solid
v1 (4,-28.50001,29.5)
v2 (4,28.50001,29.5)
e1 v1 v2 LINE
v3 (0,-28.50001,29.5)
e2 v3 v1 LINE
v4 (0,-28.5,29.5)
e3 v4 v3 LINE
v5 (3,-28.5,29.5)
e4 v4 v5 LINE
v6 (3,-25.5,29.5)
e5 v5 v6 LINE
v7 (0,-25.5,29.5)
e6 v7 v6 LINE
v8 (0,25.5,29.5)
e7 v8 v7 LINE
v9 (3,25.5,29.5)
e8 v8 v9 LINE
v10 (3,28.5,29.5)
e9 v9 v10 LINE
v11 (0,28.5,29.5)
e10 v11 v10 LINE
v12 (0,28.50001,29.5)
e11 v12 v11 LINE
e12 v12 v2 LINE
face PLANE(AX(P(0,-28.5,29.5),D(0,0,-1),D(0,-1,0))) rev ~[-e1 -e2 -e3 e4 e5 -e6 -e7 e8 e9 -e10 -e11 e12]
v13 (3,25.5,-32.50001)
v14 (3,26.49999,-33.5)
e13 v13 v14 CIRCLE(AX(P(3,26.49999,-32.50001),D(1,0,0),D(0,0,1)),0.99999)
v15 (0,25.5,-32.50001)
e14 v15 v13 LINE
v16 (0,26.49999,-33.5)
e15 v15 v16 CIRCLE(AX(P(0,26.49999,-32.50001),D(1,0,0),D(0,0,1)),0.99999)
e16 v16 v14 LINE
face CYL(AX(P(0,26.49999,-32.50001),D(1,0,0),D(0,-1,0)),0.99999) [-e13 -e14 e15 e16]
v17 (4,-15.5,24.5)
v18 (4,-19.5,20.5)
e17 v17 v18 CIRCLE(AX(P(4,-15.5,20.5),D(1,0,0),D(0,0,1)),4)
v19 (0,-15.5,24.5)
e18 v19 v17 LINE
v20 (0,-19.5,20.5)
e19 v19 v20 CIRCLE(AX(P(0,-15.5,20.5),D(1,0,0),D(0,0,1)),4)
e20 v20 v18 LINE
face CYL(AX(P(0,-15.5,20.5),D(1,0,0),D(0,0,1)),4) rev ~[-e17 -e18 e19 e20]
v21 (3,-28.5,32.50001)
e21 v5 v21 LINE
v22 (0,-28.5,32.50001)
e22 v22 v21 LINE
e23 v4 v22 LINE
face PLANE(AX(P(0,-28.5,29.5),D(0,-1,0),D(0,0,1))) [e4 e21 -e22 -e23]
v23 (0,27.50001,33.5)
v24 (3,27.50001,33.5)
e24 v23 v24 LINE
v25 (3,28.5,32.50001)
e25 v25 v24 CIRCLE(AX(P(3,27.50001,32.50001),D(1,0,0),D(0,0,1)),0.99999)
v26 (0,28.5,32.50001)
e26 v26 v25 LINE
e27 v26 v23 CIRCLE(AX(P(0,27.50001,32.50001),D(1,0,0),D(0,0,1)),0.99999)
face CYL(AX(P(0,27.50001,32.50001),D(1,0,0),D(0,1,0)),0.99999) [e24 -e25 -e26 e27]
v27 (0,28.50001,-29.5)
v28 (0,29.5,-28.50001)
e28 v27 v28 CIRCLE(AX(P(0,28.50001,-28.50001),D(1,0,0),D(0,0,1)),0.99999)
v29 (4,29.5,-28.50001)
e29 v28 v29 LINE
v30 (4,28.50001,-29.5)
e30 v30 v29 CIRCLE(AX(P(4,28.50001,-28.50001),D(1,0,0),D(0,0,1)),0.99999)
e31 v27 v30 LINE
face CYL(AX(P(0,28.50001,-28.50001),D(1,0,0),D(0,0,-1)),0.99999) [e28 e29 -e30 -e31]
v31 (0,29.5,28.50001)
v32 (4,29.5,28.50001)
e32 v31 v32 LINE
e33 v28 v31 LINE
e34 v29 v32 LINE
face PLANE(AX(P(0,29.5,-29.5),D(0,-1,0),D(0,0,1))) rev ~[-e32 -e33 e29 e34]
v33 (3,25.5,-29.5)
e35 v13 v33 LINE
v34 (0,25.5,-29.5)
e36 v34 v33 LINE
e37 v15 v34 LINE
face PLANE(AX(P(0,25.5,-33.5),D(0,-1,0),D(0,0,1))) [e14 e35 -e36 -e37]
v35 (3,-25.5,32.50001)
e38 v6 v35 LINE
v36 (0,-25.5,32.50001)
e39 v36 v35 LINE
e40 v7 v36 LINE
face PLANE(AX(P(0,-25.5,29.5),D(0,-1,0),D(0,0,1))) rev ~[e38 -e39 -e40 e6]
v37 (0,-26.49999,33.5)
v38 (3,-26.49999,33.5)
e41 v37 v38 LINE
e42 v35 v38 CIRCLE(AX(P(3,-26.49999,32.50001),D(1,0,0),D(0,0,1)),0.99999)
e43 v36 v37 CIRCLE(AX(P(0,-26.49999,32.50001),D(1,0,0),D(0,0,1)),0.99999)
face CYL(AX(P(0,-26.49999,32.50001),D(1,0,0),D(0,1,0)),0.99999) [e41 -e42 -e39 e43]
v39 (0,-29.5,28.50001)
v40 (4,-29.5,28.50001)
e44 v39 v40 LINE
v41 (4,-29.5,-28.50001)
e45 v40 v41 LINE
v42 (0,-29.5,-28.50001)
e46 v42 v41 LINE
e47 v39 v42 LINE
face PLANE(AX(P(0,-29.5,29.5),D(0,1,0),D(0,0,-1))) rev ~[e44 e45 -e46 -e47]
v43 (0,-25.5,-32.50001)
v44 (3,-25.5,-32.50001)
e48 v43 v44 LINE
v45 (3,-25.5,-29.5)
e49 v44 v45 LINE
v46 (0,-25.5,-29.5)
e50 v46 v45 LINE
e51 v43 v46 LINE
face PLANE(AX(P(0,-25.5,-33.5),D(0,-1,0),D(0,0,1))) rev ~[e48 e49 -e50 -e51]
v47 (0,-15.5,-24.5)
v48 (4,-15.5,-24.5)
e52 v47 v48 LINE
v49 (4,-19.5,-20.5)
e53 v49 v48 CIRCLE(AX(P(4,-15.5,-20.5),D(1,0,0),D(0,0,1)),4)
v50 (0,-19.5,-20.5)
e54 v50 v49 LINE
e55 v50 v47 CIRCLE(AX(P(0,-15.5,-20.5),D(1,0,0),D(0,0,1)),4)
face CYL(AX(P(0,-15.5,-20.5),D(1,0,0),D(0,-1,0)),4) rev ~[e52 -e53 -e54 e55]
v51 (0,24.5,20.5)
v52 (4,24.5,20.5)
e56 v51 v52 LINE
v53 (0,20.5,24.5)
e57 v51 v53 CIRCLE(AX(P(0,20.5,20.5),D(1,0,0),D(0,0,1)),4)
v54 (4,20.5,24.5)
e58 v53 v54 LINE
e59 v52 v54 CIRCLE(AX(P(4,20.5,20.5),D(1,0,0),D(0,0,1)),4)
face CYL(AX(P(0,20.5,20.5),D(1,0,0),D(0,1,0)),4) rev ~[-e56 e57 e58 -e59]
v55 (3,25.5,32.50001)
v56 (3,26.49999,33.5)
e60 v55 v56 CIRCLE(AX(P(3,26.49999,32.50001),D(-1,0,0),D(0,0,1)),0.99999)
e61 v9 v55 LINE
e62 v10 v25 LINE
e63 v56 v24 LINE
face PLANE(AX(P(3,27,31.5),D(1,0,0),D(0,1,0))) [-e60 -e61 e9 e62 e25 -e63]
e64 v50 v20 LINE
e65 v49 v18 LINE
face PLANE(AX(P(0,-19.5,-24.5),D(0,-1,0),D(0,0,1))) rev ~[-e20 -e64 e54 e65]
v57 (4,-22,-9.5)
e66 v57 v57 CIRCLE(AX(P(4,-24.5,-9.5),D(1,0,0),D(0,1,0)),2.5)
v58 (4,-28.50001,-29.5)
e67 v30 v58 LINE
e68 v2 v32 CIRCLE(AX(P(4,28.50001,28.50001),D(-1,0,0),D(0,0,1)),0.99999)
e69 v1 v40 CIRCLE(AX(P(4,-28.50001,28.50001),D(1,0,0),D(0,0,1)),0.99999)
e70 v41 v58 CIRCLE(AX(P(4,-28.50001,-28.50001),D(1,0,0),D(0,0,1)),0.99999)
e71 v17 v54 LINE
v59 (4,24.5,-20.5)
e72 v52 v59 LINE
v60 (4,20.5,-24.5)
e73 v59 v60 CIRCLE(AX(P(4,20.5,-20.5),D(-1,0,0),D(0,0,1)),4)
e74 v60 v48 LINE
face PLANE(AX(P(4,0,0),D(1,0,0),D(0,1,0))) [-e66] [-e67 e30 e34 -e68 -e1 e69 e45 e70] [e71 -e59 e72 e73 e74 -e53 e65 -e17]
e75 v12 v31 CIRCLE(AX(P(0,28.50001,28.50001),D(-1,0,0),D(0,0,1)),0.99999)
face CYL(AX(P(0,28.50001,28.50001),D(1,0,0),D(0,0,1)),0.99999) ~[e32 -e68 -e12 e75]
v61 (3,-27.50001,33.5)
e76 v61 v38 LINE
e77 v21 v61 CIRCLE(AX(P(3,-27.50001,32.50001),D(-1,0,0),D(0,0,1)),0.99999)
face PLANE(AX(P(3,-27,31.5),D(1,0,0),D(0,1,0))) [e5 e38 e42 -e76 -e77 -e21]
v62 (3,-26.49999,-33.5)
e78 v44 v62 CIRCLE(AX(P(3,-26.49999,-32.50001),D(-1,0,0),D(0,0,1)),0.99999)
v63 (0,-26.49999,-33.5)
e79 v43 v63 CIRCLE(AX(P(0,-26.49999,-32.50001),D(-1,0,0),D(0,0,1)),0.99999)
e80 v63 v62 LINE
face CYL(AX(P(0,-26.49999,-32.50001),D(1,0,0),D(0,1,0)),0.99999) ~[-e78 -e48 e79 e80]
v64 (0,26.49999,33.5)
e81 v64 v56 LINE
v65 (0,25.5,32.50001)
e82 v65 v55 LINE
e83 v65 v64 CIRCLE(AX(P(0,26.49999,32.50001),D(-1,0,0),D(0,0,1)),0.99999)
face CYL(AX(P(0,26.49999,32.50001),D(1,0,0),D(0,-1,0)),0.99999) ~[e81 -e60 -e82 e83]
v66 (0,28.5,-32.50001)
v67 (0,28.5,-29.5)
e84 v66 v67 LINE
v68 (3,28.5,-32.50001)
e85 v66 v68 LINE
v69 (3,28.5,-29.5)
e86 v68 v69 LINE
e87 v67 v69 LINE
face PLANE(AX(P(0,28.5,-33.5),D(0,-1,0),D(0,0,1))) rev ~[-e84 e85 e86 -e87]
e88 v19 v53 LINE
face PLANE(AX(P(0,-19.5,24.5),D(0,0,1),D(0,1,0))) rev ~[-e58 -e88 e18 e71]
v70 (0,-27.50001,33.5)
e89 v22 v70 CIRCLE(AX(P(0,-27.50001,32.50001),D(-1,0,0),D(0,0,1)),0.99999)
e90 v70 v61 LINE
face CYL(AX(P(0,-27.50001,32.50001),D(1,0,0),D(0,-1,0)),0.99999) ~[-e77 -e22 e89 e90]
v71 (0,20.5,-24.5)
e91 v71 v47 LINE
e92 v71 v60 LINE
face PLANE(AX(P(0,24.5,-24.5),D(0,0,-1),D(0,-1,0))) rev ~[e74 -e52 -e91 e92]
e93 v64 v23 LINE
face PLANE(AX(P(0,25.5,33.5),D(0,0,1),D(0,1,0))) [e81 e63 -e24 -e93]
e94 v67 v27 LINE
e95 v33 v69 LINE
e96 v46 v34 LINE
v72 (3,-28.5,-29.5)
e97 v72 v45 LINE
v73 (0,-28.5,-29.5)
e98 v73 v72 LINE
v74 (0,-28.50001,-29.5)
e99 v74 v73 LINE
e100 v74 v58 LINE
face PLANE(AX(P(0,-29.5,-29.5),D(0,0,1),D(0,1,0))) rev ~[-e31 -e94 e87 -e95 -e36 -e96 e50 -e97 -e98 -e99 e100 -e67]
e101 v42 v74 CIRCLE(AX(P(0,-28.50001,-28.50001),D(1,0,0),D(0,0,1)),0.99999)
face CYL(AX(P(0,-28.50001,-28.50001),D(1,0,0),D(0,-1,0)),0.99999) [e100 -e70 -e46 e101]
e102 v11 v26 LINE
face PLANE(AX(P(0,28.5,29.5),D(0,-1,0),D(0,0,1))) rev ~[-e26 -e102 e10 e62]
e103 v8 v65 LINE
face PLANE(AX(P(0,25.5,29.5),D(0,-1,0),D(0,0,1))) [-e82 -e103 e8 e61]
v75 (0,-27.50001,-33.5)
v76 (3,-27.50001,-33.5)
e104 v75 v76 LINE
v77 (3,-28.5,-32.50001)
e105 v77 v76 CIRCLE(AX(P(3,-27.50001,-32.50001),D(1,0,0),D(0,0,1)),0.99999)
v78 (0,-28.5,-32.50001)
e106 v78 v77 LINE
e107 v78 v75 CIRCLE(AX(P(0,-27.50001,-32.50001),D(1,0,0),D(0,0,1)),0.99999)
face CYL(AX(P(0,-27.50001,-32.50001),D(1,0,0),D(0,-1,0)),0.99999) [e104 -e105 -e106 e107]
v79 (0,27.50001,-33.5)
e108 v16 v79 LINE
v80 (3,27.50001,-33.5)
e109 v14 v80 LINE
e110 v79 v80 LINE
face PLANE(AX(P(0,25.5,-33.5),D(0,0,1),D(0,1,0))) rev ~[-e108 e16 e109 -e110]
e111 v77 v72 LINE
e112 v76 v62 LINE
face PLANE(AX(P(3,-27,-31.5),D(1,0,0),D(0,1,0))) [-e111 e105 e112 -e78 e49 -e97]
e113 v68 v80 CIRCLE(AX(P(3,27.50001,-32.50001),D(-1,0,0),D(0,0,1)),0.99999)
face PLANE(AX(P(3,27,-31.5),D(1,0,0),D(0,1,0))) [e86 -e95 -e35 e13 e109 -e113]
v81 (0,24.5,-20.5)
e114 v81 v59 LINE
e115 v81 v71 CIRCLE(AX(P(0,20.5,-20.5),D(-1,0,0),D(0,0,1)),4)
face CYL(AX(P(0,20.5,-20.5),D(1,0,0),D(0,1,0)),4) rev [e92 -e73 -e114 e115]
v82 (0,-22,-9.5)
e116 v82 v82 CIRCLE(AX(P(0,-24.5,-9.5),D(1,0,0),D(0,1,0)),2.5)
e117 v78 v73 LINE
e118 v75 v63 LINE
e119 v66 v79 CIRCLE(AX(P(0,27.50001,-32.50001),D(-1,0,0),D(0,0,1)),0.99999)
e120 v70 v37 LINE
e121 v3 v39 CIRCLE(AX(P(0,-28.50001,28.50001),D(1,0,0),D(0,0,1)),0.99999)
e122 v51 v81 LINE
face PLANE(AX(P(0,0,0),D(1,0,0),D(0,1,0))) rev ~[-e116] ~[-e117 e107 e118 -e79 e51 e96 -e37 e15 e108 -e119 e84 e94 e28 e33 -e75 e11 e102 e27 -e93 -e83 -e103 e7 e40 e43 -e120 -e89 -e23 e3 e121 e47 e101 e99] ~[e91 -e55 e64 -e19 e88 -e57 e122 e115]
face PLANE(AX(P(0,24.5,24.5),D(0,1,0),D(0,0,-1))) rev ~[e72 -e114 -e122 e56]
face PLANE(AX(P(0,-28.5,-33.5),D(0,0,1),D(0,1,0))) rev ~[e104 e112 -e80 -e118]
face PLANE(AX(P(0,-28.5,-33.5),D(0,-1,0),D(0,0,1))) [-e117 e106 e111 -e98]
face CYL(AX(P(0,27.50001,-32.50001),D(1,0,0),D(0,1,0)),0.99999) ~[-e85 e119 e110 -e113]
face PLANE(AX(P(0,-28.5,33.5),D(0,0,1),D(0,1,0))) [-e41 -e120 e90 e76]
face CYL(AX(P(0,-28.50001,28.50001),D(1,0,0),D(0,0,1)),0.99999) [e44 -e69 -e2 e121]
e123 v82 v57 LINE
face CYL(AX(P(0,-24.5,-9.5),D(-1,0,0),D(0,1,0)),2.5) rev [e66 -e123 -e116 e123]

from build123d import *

# Parameters (mm, degrees)
F0_R     = 2.5
F0_W     = 3
F0_H     = 4
F1_DEPTH = 4
F2_W     = 3
F2_H     = 4
F3_DEPTH = 1
F4_R     = 4
F5_R     = 0.99999


# Not quite as in the source:
# - a fillet or chamfer is up to 0.001 mm smaller than in the source, because OpenCascade refuses the exact size


with BuildPart() as f1:
    # F0 (on Right) → F1 (new body)
    with BuildSketch(Plane.YZ):
        Polygon((-28.5, 29.5), (-29.5, 29.5), (-29.5, -29.5), (-28.5, -29.5), (-25.5, -29.5), (25.5, -29.5), (28.5, -29.5), (29.5, -29.5), (29.5, 29.5), (28.5, 29.5), (25.5, 29.5), (-25.5, 29.5), align=None)
        with Locations((-24.5, -9.5)):
            Circle(F0_R, mode=Mode.SUBTRACT)
        Polygon((19.5, -24.5), (-19.5, -24.5), (-19.5, 24.5), (19.5, 24.5), (24.5, 24.5), (24.5, -24.5), align=None, mode=Mode.SUBTRACT)
        with Locations((-27, 31.5)):
            Rectangle(F0_W, F0_H)
        with Locations((27, 31.5)):
            Rectangle(F0_W, F0_H)
        with Locations((-27, -31.5)):
            Rectangle(F0_W, F0_H)
        with Locations((27, -31.5)):
            Rectangle(F0_W, F0_H)
    extrude(amount=F1_DEPTH)

    # F2 (on face) → F3 (cut)
    with BuildSketch(Plane.YZ.offset(4)):
        with Locations((-27, 31.5)):
            Rectangle(F2_W, F2_H)
        with Locations((27, 31.5)):
            Rectangle(F2_W, F2_H)
        with Locations((-27, -31.5)):
            Rectangle(F2_W, F2_H)
        with Locations((27, -31.5)):
            Rectangle(F2_W, F2_H)
    extrude(amount=-F3_DEPTH, mode=Mode.SUBTRACT)

    # F4
    f4_edges = [f1.edges().sort_by_distance(p)[0] for p in [
        (2, -19.5, 24.5),
        (2, 24.5, 24.5),
        (2, 24.5, -24.5),
        (2, -19.5, -24.5),
    ]]
    fillet(f4_edges, radius=F4_R)

    # F5 (radius 1 in the source; OpenCascade refuses exactly that, so slightly less here)
    f5_edges = [f1.edges().sort_by_distance(p)[0] for p in [
        (1.5, -28.5, 33.5),
        (2, -29.5, 29.5),
        (1.5, -25.5, 33.5),
        (1.5, 25.5, 33.5),
        (1.5, 28.5, 33.5),
        (2, 29.5, 29.5),
        (1.5, -25.5, -33.5),
        (1.5, -28.5, -33.5),
        (2, -29.5, -29.5),
        (1.5, 25.5, -33.5),
        (1.5, 28.5, -33.5),
        (2, 29.5, -29.5),
    ]]
    fillet(f5_edges, radius=F5_R)


solid = f1.part
